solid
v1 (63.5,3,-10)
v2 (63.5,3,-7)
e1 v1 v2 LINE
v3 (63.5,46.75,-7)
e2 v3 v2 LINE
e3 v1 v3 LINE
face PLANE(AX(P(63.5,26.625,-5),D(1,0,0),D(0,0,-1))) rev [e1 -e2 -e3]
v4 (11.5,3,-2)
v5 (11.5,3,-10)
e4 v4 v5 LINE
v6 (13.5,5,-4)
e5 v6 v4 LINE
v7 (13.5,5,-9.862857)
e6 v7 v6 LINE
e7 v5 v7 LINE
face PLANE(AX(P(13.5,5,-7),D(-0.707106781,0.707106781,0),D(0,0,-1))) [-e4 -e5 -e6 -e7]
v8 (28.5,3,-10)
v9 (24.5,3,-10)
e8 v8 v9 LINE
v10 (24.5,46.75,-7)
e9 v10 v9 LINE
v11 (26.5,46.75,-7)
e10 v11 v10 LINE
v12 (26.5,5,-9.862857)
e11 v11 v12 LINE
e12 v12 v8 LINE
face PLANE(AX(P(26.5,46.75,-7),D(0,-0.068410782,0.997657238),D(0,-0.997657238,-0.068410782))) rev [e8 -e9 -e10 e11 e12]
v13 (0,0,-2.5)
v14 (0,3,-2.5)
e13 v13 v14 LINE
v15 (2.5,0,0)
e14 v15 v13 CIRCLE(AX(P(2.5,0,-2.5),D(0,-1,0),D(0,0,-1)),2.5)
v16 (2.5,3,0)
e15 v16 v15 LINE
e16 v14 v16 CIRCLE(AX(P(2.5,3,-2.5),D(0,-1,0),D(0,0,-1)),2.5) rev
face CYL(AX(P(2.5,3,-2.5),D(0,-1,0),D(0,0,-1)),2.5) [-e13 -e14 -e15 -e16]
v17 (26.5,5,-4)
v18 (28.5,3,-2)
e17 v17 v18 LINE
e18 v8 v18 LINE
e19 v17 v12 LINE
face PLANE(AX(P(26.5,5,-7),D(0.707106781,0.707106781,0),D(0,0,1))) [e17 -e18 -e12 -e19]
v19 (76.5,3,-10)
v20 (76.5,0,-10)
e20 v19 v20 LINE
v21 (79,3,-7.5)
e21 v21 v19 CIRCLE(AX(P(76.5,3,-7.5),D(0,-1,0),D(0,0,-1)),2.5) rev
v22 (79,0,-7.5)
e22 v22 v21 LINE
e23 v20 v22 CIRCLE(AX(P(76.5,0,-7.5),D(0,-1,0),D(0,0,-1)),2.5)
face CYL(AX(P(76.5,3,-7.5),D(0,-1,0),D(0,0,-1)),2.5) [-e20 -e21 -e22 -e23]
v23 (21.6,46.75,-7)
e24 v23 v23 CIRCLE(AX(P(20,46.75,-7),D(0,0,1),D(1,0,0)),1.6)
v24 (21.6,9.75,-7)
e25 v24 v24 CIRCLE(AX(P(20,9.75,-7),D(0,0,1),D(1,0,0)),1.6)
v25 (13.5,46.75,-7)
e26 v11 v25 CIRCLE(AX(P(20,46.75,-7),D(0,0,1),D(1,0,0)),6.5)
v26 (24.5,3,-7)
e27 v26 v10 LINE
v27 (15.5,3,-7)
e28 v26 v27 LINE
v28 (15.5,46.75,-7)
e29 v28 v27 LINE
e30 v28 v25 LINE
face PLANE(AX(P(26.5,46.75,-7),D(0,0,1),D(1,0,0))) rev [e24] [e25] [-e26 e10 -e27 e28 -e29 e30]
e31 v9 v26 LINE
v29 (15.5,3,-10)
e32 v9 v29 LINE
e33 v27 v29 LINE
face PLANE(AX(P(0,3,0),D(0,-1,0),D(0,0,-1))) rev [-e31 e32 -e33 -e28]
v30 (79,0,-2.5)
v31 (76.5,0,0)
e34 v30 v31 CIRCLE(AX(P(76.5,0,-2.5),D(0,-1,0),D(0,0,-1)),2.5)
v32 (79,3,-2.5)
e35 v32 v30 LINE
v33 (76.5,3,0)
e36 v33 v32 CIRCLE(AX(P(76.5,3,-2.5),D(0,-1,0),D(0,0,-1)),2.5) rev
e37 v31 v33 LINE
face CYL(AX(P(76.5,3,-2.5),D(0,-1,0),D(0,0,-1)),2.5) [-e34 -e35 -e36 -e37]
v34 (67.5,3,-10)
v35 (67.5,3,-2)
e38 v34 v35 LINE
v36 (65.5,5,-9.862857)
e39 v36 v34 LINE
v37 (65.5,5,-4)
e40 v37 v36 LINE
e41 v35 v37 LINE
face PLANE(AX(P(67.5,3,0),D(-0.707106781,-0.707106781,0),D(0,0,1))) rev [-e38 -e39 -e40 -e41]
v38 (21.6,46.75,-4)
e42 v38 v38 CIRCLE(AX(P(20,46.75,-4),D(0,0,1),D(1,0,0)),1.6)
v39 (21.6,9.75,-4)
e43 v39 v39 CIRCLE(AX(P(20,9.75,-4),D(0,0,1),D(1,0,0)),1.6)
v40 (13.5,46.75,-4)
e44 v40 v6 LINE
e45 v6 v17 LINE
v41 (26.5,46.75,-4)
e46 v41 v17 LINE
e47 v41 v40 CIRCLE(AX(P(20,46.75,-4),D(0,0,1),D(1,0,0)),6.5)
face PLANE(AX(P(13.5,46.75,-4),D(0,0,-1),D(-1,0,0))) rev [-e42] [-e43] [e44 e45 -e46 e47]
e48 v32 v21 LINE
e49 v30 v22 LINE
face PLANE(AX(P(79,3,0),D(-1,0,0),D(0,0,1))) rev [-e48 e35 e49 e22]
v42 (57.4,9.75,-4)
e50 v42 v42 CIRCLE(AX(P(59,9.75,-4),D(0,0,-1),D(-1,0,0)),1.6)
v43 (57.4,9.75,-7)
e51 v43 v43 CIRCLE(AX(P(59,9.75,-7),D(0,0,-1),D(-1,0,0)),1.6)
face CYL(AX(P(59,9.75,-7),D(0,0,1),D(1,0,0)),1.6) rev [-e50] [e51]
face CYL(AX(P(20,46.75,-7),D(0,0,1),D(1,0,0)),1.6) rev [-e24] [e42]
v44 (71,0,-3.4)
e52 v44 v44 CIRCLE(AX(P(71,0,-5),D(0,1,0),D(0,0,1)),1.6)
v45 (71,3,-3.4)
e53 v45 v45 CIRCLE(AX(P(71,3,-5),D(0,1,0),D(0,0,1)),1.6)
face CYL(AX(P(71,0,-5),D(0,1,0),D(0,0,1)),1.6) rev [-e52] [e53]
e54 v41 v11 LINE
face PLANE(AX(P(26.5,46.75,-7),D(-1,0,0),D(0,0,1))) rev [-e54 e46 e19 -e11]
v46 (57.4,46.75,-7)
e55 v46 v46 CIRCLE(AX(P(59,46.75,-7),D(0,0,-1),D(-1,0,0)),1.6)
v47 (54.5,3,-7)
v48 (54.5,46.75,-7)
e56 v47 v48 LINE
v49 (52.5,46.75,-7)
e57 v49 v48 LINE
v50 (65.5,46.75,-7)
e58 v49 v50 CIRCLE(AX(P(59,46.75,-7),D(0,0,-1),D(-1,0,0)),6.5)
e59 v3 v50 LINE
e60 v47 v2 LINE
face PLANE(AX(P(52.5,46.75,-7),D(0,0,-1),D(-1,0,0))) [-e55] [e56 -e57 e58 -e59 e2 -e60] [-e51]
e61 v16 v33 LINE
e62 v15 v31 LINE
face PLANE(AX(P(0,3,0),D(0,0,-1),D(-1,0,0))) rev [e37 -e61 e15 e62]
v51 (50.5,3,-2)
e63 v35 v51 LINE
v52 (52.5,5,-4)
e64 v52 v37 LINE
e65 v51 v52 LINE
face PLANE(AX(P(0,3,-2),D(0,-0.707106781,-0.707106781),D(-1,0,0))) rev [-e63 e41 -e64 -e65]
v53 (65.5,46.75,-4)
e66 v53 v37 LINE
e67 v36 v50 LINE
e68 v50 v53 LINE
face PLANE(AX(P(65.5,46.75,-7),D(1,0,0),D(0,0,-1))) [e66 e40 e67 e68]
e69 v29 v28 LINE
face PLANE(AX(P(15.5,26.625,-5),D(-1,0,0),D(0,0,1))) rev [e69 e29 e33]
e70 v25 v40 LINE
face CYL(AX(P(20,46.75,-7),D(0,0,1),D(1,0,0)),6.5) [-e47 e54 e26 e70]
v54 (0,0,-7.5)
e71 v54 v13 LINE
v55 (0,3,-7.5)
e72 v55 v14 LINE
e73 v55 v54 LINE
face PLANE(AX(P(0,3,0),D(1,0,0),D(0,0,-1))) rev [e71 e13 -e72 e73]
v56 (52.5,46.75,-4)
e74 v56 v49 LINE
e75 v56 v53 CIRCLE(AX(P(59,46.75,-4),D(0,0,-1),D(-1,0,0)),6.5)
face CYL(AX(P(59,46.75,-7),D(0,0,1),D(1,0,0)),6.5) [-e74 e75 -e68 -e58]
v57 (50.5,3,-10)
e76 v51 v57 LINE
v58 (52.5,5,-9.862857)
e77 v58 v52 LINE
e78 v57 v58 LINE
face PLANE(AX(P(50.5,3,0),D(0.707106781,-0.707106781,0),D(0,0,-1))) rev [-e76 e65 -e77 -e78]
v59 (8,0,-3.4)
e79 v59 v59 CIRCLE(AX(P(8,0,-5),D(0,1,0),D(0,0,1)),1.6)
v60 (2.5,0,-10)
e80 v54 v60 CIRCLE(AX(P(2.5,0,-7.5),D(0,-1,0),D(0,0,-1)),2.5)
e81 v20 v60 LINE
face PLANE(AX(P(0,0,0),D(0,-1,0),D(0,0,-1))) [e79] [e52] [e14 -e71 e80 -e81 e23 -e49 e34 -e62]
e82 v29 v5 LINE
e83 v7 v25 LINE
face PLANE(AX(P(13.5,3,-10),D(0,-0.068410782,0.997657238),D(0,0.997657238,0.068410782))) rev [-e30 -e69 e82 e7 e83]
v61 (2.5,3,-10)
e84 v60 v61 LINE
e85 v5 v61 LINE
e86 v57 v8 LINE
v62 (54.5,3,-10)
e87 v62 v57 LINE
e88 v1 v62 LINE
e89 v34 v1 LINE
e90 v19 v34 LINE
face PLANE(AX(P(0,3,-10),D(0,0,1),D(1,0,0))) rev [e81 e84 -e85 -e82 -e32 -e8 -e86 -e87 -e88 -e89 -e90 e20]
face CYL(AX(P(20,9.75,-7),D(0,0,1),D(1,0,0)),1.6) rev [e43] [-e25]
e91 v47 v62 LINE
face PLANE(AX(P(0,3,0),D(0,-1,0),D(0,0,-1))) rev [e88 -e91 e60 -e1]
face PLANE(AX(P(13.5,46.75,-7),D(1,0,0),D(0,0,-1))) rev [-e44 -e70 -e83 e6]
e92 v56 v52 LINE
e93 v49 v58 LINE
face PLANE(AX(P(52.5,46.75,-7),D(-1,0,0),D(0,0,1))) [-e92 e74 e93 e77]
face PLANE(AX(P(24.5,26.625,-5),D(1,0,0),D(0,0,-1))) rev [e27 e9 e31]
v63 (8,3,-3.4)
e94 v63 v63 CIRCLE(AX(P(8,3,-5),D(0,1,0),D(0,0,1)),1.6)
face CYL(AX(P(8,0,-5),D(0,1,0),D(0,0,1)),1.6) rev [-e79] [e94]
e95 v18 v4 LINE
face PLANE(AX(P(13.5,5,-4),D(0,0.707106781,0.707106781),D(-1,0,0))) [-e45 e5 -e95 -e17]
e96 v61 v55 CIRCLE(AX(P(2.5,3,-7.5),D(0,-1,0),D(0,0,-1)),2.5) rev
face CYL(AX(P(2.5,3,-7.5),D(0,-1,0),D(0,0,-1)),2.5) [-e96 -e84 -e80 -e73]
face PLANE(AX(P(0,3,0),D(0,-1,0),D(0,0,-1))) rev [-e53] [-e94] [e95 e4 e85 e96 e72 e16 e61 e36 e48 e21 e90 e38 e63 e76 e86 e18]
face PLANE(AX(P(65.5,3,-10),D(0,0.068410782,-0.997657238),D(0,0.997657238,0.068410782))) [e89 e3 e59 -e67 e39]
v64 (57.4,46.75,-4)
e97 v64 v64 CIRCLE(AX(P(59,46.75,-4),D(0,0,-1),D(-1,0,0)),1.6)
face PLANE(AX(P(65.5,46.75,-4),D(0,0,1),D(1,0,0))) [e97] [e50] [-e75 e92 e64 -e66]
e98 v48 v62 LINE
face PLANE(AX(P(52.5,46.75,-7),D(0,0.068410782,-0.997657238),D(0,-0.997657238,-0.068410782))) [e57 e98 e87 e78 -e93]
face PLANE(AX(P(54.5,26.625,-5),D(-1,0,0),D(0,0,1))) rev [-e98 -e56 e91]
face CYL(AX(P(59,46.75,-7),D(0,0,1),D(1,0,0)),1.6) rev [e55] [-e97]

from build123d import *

# Parameters (mm, degrees)
SKETCH_1_W                 = 79
SKETCH_1_H                 = 10
EXTRUDE_1_DEPTH            = 3
SKETCH_2_W                 = 13
SKETCH_2_H                 = 3
EXTRUDE_2_DEPTH            = 43.75
EXTRUDE_3_DEPTH            = 3
RIB_1_REACH                = 87.005
SKETCH_5_WALL_W            = 215.862295072
SKETCH_5_WALL_H            = 2
RIB_2_REACH                = 77.444
SKETCH_7_WALL_W            = 196.740940164
SKETCH_7_WALL_H            = 2
SKETCH_8_R                 = 1.6
CUT_EXTRUDE_1_DEPTH        = 3
FILLET_1_R                 = 2.5
SKETCH_9_R                 = 1.6
CUT_EXTRUDE_5_DEPTH        = 3
CHAMFER_2_SIZE             = 2
CHAMFER_2_OF_MIRROR_1_SIZE = 2


with BuildPart() as part:
    # 草图1 → 凸台-拉伸1 (new body)
    with BuildSketch(Plane(origin=(0, 0, 0), x_dir=(1, 0, 0), z_dir=(0, 1, 0))):
        with Locations((39.5, 5)):
            Rectangle(SKETCH_1_W, SKETCH_1_H)
    extrude(amount=EXTRUDE_1_DEPTH)

    # 草图2 → 凸台-拉伸2 (add)
    with BuildSketch(Plane(origin=(0, 3, 0), x_dir=(1, 0, 0), z_dir=(0, 1, 0))):
        with Locations((20, 5.5)):
            Rectangle(SKETCH_2_W, SKETCH_2_H)
    extrude_2 = extrude(amount=EXTRUDE_2_DEPTH)

    # 草图4 → 凸台-拉伸3 (add)
    with BuildSketch(Plane.XY.offset(-4)):
        with BuildLine():
            Line((13.5, 46.75), (26.5, 46.75))
            ThreePointArc((26.5, 46.75), (20, 53.25), (13.5, 46.75))
        make_face()
    extrude_3 = extrude(amount=-EXTRUDE_3_DEPTH)

    # 草图5 wall → 筋1 (add, up to next)
    with BuildSketch(Plane(origin=(13.5, 24.875, -8.5), x_dir=(0, 0.997657238183, 0.068410782047), z_dir=(0, 0.068410782047, -0.997657238183)), mode=Mode.PRIVATE) as rib_1_sk1:
        with Locations((0, 1)):
            Rectangle(SKETCH_5_WALL_W, SKETCH_5_WALL_H)
    rib_1_tool1 = extrude(rib_1_sk1.sketch, amount=-RIB_1_REACH, mode=Mode.PRIVATE) - part.part
    rib_1 = rib_1_tool1.solids().sort_by_distance((13.5, 24.875, -8.5))[0]
    add(rib_1)

    # 草图7 wall → 筋2 (add, up to next)
    with BuildSketch(Plane(origin=(26.5, 24.875, -8.5), x_dir=(0, -0.997657238183, -0.068410782047), z_dir=(0, 0.068410782047, -0.997657238183)), mode=Mode.PRIVATE) as rib_2_sk1:
        with Locations((0, 1)):
            Rectangle(SKETCH_7_WALL_W, SKETCH_7_WALL_H)
    rib_2_tool1 = extrude(rib_2_sk1.sketch, amount=-RIB_2_REACH, mode=Mode.PRIVATE) - part.part
    rib_2 = rib_2_tool1.solids().sort_by_distance((26.5, 24.875, -8.5))[0]
    add(rib_2)

    # 草图8 → 切除-拉伸1 (cut)
    with BuildSketch(Plane.XY.offset(-4)):
        with Locations((20, 9.75)):
            Circle(SKETCH_8_R)
        with Locations((20, 46.75)):
            Circle(SKETCH_8_R)
    cut_extrude_1 = extrude(amount=-CUT_EXTRUDE_1_DEPTH, mode=Mode.SUBTRACT)

    # 圆角1
    fillet_1_edges = [part.edges().sort_by_distance(p)[0] for p in [
        (0, 1.5, -10),
        (79, 1.5, -10),
        (79, 1.5, 0),
        (0, 1.5, 0),
    ]]
    fillet(fillet_1_edges, radius=FILLET_1_R)

    # 草图9 → 切除-拉伸5 (cut)
    with BuildSketch(Plane(origin=(0, 3, 0), x_dir=(1, 0, 0), z_dir=(0, 1, 0))):
        with Locations((8, 5)):
            Circle(SKETCH_9_R)
        with Locations((71, 5)):
            Circle(SKETCH_9_R)
    extrude(amount=-CUT_EXTRUDE_5_DEPTH, mode=Mode.SUBTRACT)

    # 倒角2
    chamfer_2_edges = [part.edges().sort_by_distance(p)[0] for p in [
        (20, 3, -4),
        (26.5, 3, -7),
        (13.5, 3, -7),
    ]]
    chamfer(chamfer_2_edges, length=CHAMFER_2_SIZE)

    # 镜向1: 凸台-拉伸2, 凸台-拉伸3, 筋1, 筋2, 切除-拉伸1 across plane
    add(extrude_2.mirror(Plane.ZY.offset(-39.5)))
    add(extrude_3.mirror(Plane.ZY.offset(-39.5)))
    add(rib_1.mirror(Plane.ZY.offset(-39.5)))
    add(rib_2.mirror(Plane.ZY.offset(-39.5)))
    add(cut_extrude_1.mirror(Plane.ZY.offset(-39.5)), mode=Mode.SUBTRACT)

    # 倒角2 of 镜向1
    chamfer_2_of_mirror_1_edges = [part.edges().sort_by_distance(p)[0] for p in [
        (59, 3, -4),
        (52.5, 3, -7),
        (65.5, 3, -7),
    ]]
    chamfer(chamfer_2_of_mirror_1_edges, length=CHAMFER_2_OF_MIRROR_1_SIZE)


solid = part.part
